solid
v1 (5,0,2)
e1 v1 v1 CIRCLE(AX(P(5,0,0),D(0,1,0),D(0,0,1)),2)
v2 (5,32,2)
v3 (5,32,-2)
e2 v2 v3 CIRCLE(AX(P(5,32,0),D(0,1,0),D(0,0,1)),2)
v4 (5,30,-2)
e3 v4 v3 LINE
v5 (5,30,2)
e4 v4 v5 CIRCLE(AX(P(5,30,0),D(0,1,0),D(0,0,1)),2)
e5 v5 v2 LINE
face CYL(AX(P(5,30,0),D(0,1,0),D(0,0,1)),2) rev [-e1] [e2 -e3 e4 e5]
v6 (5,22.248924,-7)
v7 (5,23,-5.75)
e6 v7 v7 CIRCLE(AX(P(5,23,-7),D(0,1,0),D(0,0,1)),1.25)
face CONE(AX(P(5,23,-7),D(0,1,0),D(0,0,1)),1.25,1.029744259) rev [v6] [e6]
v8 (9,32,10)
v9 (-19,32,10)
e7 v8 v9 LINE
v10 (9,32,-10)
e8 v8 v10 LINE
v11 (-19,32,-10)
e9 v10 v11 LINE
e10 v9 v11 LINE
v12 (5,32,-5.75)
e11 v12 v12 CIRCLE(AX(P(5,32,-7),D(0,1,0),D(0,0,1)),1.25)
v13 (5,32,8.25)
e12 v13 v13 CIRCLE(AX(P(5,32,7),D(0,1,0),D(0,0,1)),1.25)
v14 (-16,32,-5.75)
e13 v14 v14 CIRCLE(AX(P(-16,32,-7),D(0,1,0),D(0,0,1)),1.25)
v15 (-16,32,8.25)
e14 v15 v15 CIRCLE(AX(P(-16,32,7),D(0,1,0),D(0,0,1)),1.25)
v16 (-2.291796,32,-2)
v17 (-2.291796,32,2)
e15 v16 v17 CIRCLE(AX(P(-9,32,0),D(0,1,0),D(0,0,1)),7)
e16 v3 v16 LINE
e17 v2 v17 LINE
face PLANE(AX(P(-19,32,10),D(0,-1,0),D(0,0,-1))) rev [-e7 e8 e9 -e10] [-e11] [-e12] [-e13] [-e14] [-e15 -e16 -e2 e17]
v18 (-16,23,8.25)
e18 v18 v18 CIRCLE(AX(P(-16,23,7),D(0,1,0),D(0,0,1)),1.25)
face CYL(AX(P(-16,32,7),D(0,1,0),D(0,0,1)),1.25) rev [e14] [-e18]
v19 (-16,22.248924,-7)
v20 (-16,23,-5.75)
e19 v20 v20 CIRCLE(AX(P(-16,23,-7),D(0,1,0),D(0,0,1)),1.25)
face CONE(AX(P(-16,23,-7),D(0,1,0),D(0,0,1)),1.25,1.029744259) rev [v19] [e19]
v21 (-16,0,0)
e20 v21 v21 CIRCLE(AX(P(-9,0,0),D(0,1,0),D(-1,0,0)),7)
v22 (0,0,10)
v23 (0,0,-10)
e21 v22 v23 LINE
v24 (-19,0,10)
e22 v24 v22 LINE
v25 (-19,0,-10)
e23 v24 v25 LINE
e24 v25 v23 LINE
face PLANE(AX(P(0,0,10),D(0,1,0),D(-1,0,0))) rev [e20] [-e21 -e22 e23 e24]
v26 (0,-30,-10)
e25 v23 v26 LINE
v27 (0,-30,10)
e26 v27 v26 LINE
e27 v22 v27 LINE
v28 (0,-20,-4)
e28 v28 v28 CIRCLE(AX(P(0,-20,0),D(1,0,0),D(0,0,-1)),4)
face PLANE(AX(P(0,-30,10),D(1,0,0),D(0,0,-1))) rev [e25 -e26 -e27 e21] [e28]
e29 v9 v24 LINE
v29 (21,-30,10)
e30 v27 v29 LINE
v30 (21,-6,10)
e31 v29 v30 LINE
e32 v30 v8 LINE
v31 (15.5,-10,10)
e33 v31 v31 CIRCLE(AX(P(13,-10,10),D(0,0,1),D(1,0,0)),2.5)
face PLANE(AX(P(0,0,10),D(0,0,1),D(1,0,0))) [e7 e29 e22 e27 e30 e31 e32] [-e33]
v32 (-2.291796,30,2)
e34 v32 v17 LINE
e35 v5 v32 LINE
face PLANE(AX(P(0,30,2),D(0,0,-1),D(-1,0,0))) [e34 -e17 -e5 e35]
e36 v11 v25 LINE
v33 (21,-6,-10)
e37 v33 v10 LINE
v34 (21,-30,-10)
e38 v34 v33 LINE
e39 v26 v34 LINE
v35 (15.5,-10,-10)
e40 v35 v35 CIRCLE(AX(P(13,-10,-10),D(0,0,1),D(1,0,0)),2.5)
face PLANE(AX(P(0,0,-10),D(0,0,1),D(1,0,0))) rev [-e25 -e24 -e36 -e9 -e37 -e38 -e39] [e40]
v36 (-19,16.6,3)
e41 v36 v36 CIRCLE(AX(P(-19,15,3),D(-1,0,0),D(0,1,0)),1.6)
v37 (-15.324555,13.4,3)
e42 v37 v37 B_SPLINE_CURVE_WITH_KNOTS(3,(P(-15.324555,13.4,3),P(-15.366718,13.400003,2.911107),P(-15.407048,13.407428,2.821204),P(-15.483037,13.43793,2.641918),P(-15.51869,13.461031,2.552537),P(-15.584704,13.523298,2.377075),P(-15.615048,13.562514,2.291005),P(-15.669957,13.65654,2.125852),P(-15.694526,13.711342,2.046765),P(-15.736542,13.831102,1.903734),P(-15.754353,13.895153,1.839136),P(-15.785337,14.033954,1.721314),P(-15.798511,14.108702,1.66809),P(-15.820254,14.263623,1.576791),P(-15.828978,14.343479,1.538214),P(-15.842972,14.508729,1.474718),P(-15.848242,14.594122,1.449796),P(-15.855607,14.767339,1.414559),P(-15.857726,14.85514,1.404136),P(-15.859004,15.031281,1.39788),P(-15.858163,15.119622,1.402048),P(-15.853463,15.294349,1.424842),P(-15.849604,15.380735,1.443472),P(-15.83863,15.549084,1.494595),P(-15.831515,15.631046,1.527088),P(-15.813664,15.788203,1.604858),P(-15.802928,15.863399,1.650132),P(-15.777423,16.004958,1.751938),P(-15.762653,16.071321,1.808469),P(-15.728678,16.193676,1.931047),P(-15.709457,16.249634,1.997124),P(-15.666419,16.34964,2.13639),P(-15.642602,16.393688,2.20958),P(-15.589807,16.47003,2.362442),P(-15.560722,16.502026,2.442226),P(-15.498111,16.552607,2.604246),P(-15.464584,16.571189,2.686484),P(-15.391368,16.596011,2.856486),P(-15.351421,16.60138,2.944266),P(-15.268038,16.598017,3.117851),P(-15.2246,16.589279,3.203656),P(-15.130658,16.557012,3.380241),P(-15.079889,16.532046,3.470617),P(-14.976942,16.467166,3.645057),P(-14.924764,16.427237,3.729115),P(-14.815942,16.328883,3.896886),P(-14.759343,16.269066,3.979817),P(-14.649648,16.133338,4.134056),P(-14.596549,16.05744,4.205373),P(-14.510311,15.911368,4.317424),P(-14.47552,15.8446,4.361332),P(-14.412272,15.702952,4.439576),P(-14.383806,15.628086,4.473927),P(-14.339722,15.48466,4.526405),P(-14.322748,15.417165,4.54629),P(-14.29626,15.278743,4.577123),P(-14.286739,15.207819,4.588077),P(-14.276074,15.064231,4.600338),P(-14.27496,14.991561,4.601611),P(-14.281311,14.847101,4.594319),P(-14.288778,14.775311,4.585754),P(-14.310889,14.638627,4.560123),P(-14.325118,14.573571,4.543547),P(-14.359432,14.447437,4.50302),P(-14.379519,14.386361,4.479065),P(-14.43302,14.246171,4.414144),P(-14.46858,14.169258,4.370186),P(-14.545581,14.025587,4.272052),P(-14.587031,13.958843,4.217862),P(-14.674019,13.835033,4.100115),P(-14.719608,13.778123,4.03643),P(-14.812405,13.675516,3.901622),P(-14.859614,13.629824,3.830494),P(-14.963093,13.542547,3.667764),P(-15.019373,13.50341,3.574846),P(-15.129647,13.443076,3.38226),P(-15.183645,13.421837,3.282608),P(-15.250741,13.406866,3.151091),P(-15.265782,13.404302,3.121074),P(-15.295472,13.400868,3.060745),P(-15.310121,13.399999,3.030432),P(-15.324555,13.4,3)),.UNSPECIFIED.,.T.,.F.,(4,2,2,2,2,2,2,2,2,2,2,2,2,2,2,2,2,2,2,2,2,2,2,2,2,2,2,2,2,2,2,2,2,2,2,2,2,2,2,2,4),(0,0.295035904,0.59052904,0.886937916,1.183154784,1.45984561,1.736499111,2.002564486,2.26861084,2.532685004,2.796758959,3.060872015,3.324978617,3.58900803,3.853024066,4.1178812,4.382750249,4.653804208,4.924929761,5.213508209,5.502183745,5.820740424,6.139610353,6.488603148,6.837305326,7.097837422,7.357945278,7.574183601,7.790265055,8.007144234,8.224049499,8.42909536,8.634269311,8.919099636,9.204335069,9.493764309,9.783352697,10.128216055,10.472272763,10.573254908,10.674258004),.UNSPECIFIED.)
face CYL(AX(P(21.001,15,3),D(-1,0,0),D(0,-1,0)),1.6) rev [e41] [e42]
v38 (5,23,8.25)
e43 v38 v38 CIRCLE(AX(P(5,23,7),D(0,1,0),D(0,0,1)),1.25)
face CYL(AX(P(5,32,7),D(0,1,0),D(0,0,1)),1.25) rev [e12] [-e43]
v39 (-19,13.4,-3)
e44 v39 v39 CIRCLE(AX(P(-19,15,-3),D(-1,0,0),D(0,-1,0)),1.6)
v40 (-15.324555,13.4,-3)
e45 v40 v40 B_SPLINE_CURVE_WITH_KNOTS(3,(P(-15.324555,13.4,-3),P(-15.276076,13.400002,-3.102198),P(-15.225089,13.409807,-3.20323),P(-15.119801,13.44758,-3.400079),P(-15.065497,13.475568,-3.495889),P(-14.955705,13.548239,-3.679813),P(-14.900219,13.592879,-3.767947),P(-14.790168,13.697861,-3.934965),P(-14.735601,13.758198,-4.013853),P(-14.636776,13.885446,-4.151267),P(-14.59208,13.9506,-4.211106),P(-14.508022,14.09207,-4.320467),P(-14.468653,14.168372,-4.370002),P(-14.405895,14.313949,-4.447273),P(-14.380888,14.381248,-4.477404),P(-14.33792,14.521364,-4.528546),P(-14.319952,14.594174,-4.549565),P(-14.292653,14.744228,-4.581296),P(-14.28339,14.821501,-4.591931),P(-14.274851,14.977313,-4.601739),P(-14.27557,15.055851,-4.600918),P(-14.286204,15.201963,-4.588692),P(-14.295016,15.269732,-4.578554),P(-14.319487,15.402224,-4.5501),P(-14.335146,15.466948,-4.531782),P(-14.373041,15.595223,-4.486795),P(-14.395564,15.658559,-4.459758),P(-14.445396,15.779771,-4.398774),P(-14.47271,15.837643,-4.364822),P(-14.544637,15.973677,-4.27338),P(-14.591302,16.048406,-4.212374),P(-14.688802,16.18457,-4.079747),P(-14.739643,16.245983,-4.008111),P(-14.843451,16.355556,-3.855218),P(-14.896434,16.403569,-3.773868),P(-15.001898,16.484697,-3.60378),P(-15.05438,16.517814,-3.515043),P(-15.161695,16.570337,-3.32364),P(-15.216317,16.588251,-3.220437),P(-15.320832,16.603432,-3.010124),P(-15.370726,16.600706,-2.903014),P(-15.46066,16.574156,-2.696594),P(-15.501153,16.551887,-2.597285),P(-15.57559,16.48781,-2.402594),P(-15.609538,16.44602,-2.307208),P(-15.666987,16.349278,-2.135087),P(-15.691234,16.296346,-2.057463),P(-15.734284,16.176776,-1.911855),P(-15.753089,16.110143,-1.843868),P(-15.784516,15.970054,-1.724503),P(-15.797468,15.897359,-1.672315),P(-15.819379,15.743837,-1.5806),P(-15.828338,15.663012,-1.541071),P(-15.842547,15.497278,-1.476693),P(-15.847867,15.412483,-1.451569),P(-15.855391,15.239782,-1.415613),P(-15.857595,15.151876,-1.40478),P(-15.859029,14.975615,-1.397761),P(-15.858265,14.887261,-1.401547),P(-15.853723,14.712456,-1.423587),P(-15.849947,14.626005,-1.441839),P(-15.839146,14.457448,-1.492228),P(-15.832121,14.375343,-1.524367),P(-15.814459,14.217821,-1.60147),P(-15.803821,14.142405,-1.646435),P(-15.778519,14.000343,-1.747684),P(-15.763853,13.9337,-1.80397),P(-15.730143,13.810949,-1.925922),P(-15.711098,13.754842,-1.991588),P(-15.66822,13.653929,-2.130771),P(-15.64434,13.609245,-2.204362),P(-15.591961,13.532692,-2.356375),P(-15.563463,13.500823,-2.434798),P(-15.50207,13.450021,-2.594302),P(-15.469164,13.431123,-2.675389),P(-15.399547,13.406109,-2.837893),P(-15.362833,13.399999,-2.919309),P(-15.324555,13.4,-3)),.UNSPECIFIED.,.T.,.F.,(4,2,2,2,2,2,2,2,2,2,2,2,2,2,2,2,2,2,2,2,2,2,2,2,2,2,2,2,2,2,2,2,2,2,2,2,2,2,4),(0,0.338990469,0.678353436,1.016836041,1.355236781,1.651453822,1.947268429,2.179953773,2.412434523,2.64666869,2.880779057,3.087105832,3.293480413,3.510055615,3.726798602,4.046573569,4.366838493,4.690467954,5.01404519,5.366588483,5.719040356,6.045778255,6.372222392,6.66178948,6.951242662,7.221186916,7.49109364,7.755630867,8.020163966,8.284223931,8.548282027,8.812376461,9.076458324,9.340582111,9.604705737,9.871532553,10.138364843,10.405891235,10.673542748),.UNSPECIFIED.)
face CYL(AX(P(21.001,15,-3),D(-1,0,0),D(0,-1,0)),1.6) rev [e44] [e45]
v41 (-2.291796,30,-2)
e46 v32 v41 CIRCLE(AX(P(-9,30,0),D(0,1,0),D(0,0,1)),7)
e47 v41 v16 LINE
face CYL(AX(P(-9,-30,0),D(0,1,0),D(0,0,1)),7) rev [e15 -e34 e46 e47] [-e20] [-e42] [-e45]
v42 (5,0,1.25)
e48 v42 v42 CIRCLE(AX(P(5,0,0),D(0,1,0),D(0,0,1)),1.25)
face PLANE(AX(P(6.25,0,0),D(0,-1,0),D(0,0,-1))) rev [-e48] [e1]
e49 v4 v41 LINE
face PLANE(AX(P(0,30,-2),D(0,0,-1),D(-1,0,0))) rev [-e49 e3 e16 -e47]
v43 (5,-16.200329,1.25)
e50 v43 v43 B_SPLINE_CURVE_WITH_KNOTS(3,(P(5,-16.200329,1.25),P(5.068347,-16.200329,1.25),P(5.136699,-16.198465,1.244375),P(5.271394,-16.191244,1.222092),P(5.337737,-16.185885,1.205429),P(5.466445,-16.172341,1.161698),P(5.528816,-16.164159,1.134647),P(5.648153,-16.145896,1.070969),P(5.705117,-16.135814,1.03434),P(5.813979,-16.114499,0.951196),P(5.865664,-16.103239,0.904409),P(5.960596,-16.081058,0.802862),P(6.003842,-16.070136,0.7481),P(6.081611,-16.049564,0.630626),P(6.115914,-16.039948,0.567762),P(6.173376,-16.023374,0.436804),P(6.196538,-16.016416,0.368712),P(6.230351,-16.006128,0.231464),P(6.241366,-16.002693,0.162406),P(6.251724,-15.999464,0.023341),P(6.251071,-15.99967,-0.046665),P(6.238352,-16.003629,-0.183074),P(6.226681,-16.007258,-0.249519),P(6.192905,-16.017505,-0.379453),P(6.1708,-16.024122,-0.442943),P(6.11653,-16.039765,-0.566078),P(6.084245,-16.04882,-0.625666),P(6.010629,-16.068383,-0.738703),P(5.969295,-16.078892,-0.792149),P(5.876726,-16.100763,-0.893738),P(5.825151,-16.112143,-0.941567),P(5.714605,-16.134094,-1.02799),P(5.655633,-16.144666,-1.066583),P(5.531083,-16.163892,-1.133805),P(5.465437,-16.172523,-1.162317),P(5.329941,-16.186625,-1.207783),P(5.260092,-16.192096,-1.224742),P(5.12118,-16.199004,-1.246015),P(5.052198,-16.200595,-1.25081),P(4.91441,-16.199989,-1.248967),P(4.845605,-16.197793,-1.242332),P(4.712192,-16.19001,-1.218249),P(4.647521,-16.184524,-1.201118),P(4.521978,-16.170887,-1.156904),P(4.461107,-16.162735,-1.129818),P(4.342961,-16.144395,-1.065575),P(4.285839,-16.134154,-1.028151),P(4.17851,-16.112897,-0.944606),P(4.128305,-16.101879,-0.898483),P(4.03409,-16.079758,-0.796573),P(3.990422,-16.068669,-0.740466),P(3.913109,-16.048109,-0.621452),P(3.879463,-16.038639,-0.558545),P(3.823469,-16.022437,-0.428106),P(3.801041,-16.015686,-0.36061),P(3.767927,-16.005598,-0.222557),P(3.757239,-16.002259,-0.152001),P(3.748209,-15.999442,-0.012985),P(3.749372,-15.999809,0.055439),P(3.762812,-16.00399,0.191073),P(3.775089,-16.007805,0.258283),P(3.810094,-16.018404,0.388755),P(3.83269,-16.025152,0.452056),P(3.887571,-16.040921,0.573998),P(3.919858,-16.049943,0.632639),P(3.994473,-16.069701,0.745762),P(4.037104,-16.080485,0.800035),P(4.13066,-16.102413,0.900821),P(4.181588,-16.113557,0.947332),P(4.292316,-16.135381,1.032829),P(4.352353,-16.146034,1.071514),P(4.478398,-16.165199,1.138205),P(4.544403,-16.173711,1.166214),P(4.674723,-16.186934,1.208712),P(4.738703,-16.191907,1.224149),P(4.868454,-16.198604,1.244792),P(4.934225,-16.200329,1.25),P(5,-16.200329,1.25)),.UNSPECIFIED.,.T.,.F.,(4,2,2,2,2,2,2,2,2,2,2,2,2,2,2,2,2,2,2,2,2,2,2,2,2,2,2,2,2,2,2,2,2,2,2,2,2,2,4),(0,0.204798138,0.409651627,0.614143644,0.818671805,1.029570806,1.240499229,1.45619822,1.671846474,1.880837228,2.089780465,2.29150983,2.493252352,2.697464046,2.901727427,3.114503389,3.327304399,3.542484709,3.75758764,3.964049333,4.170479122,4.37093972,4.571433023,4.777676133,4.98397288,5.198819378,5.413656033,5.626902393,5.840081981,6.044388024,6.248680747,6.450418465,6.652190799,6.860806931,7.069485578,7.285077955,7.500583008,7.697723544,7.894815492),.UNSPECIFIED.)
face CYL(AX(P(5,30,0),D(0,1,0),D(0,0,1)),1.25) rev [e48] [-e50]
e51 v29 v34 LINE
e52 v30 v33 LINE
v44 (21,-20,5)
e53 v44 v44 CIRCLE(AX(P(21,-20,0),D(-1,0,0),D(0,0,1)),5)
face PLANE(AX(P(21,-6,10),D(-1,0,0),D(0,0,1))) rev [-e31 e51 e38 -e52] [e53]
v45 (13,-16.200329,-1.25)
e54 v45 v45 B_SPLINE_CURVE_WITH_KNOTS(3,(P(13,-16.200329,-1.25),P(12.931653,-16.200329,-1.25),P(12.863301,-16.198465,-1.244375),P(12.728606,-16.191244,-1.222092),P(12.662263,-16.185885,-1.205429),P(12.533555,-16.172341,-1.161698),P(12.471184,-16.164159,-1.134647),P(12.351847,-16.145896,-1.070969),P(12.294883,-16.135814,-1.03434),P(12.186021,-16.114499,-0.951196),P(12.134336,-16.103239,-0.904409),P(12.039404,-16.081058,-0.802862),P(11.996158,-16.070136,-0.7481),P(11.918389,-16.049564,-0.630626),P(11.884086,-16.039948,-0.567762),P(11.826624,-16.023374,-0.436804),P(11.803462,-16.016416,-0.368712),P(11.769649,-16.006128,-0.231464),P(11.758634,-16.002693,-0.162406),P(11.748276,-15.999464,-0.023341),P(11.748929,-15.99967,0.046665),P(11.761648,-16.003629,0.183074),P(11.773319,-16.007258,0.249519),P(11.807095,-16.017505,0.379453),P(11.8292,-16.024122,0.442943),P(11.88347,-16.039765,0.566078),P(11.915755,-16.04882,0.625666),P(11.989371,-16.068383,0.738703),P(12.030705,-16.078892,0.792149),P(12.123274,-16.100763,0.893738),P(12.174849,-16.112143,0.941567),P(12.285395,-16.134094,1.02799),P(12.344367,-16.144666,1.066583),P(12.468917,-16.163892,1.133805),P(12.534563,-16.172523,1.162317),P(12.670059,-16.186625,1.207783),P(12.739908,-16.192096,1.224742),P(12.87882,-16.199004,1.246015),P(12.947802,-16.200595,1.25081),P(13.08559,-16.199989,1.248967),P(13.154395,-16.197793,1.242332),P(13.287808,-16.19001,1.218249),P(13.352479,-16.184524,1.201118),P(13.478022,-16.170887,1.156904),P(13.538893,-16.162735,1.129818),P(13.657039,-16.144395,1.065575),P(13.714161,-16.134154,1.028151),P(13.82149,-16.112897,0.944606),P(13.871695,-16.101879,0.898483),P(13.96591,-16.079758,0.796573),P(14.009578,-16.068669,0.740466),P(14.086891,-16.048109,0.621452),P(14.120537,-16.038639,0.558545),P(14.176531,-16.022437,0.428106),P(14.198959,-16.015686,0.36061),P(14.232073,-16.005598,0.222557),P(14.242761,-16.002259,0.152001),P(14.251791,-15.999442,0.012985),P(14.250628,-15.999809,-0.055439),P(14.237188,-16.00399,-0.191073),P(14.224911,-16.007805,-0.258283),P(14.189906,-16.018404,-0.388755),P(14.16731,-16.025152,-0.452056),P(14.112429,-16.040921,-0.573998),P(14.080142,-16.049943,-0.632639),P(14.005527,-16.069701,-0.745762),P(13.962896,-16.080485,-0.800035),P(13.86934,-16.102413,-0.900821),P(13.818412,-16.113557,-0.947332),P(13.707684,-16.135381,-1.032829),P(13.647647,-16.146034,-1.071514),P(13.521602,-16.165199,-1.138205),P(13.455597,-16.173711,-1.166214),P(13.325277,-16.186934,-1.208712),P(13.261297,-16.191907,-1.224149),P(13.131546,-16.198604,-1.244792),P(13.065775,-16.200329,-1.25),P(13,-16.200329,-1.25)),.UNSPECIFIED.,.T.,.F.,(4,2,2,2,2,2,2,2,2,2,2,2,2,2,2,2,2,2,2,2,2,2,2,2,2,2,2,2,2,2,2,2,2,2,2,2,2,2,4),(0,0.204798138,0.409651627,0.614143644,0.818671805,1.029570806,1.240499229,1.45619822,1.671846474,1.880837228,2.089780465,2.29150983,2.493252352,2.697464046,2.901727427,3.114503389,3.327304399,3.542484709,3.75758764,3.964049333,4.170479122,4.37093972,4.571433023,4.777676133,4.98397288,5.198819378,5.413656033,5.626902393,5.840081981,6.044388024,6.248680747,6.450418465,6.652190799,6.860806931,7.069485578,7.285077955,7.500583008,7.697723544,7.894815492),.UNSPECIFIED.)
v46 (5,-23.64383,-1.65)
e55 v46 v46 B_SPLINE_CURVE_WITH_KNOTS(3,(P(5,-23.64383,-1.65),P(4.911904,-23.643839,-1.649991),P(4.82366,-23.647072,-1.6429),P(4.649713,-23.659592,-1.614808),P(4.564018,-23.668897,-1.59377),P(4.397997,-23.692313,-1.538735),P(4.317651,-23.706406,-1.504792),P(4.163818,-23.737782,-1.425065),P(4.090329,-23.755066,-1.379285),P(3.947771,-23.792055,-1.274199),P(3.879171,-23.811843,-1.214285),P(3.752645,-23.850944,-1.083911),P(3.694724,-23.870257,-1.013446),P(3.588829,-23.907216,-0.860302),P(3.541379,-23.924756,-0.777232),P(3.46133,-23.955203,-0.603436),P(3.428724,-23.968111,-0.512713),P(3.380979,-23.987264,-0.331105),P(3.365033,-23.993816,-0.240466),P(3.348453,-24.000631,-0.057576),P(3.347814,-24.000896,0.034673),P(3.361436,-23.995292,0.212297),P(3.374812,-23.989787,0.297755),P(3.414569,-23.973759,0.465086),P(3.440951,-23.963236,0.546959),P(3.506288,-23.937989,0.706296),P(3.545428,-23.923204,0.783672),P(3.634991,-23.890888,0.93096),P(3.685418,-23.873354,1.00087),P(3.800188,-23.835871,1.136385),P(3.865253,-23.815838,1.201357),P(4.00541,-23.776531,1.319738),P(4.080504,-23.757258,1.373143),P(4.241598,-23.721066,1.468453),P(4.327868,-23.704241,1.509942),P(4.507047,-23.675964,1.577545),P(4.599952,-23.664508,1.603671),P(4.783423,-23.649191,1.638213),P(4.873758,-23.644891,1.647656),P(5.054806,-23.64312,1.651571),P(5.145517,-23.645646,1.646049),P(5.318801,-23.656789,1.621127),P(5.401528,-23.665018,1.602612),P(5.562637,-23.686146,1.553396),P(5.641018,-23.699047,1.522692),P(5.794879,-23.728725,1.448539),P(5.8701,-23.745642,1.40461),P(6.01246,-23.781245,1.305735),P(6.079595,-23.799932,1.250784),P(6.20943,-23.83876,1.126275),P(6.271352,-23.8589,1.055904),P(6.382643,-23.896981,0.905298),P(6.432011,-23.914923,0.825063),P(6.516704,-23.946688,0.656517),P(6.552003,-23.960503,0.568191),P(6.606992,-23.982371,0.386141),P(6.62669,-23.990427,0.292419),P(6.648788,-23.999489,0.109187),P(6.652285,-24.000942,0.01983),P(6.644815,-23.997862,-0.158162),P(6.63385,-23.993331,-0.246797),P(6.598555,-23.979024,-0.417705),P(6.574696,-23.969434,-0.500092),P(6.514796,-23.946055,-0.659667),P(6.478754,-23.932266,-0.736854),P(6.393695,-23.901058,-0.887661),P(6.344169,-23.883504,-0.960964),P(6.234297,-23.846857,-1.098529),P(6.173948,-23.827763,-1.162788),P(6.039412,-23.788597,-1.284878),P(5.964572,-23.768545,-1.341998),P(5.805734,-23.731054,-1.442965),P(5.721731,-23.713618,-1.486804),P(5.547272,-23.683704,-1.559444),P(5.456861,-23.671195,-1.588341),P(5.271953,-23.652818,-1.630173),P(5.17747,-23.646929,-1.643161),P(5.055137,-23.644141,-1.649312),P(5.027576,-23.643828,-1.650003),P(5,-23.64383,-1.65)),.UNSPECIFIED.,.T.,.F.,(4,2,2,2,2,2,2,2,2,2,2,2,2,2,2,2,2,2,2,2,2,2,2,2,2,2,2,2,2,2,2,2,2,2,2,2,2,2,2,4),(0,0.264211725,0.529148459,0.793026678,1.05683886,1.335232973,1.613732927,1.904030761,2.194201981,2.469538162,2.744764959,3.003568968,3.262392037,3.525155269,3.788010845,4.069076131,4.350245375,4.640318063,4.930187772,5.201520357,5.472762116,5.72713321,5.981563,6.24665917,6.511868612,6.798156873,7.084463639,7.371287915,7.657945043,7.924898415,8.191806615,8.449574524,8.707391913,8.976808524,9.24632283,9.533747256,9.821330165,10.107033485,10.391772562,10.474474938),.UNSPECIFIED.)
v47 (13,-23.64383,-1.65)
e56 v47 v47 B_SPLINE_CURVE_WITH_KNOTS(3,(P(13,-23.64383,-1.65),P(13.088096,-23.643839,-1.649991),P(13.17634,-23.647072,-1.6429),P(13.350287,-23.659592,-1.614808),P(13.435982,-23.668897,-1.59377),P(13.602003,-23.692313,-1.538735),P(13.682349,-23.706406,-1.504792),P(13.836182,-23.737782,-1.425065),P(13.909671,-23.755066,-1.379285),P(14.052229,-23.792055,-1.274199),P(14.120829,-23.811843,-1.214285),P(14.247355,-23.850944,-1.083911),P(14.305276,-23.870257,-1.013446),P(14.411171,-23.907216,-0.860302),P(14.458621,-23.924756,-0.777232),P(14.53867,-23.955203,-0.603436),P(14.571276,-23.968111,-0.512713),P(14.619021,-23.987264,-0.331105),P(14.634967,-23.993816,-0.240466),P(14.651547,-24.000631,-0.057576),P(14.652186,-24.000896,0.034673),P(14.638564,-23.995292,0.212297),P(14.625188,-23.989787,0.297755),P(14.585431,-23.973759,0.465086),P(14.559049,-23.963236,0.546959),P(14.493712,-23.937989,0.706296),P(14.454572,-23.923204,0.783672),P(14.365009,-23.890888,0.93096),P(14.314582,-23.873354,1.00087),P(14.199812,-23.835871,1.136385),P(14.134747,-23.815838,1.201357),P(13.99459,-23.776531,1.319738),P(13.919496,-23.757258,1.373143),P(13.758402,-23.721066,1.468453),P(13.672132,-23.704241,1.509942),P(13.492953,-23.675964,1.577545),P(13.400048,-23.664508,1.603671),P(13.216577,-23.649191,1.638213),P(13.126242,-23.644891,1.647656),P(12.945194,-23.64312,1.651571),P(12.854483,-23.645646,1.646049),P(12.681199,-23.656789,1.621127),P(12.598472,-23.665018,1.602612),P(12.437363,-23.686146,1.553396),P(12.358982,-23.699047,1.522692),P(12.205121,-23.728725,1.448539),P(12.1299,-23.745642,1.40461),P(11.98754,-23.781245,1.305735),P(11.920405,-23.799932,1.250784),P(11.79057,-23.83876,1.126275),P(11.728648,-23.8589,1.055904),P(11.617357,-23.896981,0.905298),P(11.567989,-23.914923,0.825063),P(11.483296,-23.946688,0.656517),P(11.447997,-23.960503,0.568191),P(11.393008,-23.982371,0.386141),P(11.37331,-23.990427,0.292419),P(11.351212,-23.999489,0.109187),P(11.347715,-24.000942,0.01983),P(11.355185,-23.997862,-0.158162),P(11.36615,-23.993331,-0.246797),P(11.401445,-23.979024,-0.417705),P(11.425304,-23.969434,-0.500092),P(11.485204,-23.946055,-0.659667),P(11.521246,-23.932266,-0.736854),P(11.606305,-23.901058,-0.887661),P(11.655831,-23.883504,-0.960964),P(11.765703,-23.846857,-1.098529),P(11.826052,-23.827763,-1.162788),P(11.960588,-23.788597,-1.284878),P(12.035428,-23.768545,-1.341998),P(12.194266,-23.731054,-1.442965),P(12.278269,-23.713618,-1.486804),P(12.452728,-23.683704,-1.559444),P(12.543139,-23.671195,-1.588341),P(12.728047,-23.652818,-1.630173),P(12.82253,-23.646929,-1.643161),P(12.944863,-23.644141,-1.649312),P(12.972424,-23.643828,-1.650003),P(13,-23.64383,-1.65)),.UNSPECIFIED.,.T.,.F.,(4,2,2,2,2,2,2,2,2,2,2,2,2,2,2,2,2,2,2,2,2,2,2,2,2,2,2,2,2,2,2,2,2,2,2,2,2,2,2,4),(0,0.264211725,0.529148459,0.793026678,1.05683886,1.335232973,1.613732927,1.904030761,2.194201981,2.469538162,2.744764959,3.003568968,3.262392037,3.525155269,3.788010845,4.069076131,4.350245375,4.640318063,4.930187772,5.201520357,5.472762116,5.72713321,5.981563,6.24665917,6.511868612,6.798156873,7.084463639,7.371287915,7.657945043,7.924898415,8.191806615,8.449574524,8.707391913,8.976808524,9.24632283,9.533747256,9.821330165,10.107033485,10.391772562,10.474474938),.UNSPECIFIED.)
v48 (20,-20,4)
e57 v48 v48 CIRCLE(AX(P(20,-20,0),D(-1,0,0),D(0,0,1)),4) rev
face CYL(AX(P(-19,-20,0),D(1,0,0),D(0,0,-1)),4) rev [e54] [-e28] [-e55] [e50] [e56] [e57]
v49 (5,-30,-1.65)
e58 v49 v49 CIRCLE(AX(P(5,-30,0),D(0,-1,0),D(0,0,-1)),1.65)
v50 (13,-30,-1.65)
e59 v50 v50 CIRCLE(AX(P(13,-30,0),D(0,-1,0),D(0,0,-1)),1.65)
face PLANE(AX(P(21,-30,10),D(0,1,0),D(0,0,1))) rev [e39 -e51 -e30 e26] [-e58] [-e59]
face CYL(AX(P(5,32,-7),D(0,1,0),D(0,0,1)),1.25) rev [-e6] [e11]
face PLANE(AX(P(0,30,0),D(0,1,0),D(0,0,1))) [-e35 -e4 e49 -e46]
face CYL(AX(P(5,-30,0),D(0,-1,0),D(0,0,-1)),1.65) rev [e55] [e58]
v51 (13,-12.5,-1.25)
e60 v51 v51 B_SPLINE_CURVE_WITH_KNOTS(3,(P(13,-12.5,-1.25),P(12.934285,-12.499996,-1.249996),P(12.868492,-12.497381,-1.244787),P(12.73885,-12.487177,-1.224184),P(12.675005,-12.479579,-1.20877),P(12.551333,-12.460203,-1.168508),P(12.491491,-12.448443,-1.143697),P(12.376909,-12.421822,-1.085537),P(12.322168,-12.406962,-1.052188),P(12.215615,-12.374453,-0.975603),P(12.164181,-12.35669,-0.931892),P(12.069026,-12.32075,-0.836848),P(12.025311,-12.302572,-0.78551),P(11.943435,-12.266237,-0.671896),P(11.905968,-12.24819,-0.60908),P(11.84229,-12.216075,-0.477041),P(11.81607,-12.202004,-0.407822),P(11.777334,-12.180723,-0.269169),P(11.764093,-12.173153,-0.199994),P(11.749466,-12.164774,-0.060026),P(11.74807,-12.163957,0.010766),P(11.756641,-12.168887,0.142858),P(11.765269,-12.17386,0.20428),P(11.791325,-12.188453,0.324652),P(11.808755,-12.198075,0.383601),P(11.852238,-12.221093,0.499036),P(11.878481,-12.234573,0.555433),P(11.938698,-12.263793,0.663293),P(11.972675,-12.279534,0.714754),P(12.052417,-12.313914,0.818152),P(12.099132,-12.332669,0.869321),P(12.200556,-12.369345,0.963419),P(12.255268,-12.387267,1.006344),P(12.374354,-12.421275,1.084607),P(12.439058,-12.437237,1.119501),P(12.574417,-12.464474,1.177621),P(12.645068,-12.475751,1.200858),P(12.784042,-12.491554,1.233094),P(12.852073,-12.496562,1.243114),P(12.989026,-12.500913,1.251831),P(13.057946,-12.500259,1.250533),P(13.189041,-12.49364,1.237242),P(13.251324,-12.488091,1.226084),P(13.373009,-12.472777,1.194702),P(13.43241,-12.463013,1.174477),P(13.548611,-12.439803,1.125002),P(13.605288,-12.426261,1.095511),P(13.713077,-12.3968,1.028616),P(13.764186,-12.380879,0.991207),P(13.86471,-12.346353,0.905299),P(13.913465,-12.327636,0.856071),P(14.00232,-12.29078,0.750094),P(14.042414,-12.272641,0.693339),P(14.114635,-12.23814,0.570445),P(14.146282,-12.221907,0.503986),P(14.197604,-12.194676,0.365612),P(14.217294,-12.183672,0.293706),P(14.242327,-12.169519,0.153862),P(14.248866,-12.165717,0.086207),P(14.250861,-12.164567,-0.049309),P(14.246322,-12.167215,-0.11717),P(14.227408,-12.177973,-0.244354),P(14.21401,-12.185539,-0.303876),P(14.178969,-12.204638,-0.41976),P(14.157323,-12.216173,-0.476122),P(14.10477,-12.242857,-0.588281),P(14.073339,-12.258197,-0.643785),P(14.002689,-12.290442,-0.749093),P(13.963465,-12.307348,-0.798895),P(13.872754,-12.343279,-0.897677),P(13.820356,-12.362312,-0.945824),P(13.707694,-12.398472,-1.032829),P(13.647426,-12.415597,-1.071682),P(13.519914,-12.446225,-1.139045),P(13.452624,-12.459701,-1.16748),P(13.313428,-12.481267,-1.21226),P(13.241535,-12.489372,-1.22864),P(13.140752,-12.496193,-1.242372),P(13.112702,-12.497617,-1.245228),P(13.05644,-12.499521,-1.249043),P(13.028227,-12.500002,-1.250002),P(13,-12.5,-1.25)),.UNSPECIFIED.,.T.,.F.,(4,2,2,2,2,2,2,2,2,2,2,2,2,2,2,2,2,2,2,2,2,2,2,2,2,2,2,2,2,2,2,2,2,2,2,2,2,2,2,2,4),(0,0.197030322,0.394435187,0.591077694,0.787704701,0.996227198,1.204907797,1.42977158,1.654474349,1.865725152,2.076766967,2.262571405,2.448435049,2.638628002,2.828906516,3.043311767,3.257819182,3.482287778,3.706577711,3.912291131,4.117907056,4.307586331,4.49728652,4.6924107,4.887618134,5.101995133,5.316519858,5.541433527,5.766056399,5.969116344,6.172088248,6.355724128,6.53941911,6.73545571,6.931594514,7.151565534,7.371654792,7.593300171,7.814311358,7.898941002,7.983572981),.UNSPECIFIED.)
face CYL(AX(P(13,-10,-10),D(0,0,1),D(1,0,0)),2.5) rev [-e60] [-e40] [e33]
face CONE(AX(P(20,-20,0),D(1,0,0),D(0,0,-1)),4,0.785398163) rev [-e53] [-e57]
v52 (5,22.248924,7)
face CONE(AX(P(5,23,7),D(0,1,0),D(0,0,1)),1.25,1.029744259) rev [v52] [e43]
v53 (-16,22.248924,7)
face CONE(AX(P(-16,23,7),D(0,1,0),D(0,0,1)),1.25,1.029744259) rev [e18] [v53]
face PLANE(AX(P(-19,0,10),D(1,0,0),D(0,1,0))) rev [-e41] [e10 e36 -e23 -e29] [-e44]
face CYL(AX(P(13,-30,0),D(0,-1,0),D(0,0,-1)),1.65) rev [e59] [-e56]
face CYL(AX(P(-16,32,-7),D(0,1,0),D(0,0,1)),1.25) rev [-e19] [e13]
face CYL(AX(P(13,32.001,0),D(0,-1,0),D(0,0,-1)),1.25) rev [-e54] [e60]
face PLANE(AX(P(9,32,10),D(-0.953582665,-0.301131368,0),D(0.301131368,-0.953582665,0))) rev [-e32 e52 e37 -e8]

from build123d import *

# Parameters (mm, degrees)
BOSS_EXTRUDE1_DEPTH     = 10
CUT_EXTRUDE1_DEPTH      = 67.219333
CUT_EXTRUDE2_DEPTH      = 2
M3_TAPPED_HOLE1_D       = 2.5
M3_TAPPED_HOLE1_DEPTH   = 9
M3_TAPPED_HOLE1_TIP     = 0.751076
SKETCH5_R               = 2.5
CUT_EXTRUDE3_DEPTH      = 44.185646
SKETCH6_R               = 4
CUT_EXTRUDE4_DEPTH      = 53.191953
CHAMFER1_SIZE           = 1
HOLE1_OUTLINE_R         = 2
HOLE1_DEPTH             = 30
HOLE1_START             = -16.200329
HOLE1_2_OUTLINE_R       = 1.25
HOLE1_2_DEPTH           = 16.200329
CUT_EXTRUDE5_REACH      = 54.192
CUT_EXTRUDE5_END_RADIUS = 7
SKETCH9_R               = 1.6
M4_TAPPED_HOLE1_REACH   = 68.219
M4_TAPPED_HOLE1_BORE_R  = 1.65
CUT_EXTRUDE6_REACH      = 68.219
CUT_EXTRUDE6_END_RADIUS = 2.5
SKETCH13_R              = 1.25


# Read off the part's stored shape, not the designer's step: Hole1
with BuildPart() as part:
    # Sketch1 → Boss-Extrude1 (new, symmetric)
    with BuildSketch(Plane.XY):
        Polygon((0, 0), (-19, 0), (-19, 32), (9, 32), (21, -6), (21, -30), (0, -30), align=None)
    extrude(amount=BOSS_EXTRUDE1_DEPTH, both=True)

    # Sketch2 → Cut-Extrude1 (cut, through all)
    with BuildSketch(Plane(origin=(0, 32, 0), x_dir=(1, 0, 0), z_dir=(0, 1, 0))):
        with BuildLine():
            ThreePointArc((-2.291796, 2), (-10.010587, 6.926667), (-16, 0))
            Line((-16, 0), (-2, 0))
            ThreePointArc((-2, 0), (-2.073333, 1.010587), (-2.291796, 2))
        make_face()
        with BuildLine():
            Line((-2, 0), (-16, 0))
            ThreePointArc((-16, 0), (-10.010587, -6.926667), (-2.291796, -2))
            ThreePointArc((-2.291796, -2), (-2.073333, -1.010587), (-2, 0))
        make_face()
    extrude(amount=-CUT_EXTRUDE1_DEPTH, mode=Mode.SUBTRACT)

    # Sketch2<3> → Cut-Extrude2 (cut)
    with BuildSketch(Plane(origin=(0, 32, 0), x_dir=(1, 0, 0), z_dir=(0, 1, 0))):
        with BuildLine():
            ThreePointArc((-2.291796, 2), (-2.073333, 1.010587), (-2, 0))
            Line((-2, 0), (3, 0))
            ThreePointArc((3, 0), (3.585786, 1.414214), (5, 2))
            Line((5, 2), (-2.291796, 2))
        make_face()
        with BuildLine():
            Line((3, 0), (-2, 0))
            ThreePointArc((-2, 0), (-2.073333, -1.010587), (-2.291796, -2))
            Line((-2.291796, -2), (5, -2))
            ThreePointArc((5, -2), (3.585786, -1.414214), (3, 0))
        make_face()
        with BuildLine():
            ThreePointArc((5, 2), (3.585786, 1.414214), (3, 0))
            Line((3, 0), (7, 0))
            ThreePointArc((7, 0), (6.414214, 1.414214), (5, 2))
        make_face()
        with BuildLine():
            Line((7, 0), (3, 0))
            ThreePointArc((3, 0), (3.585786, -1.414214), (5, -2))
            ThreePointArc((5, -2), (6.414214, -1.414214), (7, 0))
        make_face()
    extrude(amount=-CUT_EXTRUDE2_DEPTH, mode=Mode.SUBTRACT)

    # M3 Tapped Hole1
    with Locations(Plane(origin=(0, 32, 0), x_dir=(1, 0, 0), z_dir=(0, 1, 0))):
        with Locations((-16, 7), (-16, -7), (5, -7), (5, 7)):
            Hole(M3_TAPPED_HOLE1_D / 2, depth=M3_TAPPED_HOLE1_DEPTH)
            with Locations((0, 0, -(M3_TAPPED_HOLE1_DEPTH + M3_TAPPED_HOLE1_TIP / 2))):  # 118° drill point
                Cone(0, M3_TAPPED_HOLE1_D / 2, M3_TAPPED_HOLE1_TIP, mode=Mode.SUBTRACT)

    # Sketch5 → Cut-Extrude3 (cut, through all)
    with BuildSketch(Plane.XY.offset(10)):
        with Locations((13, -10)):
            Circle(SKETCH5_R)
    extrude(amount=-CUT_EXTRUDE3_DEPTH, mode=Mode.SUBTRACT)

    # Sketch6 → Cut-Extrude4 (cut, through all)
    with BuildSketch(Plane(origin=(21, 0, 0), x_dir=(0, 0, -1), z_dir=(1, 0, 0))):
        with Locations((0, -20)):
            Circle(SKETCH6_R)
    extrude(amount=-CUT_EXTRUDE4_DEPTH, mode=Mode.SUBTRACT)

    # Chamfer1
    chamfer1_edges = [part.edges().sort_by_distance(p)[0] for p in [
        (21, -20, 4),
    ]]
    chamfer(chamfer1_edges, length=CHAMFER1_SIZE)

    # Hole1 outline → Hole1 (cut)
    with BuildSketch(Plane(origin=(0, 0, 0), x_dir=(1, 0, 0), z_dir=(0, 1, 0))):
        with Locations((5, 0)):
            Circle(HOLE1_OUTLINE_R)
    extrude(amount=HOLE1_DEPTH, mode=Mode.SUBTRACT)

    # Hole1 2 outline → Hole1 2 (cut)
    with BuildSketch(Plane(origin=(0, 0, 0), x_dir=(1, 0, 0), z_dir=(0, 1, 0)).offset(HOLE1_START)):
        with Locations((5, 0)):
            Circle(HOLE1_2_OUTLINE_R)
    extrude(amount=HOLE1_2_DEPTH, mode=Mode.SUBTRACT)

    # Cut-Extrude5: up to this cylinder (the profile starts outside it)
    cut_extrude5_end = Plane(origin=(-9, 15, 0), z_dir=(0, 1, 0)) * Cylinder(CUT_EXTRUDE5_END_RADIUS, 123.384, mode=Mode.PRIVATE)
    # Sketch9 → Cut-Extrude5 (cut, up to the surface)
    with BuildSketch(Plane.ZY.offset(19), mode=Mode.PRIVATE) as cut_extrude5_sk1:
        with Locations(Location((-3, 15, 0), (0, 0, 270))):
            Circle(SKETCH9_R)
    cut_extrude5_tool1 = extrude(cut_extrude5_sk1.sketch, amount=-CUT_EXTRUDE5_REACH, mode=Mode.PRIVATE) - cut_extrude5_end
    add(cut_extrude5_tool1.solids().sort_by_distance((-19, 15, -3))[0], mode=Mode.SUBTRACT)
    # Sketch9 → Cut-Extrude5 (cut, up to the surface)
    with BuildSketch(Plane.ZY.offset(19), mode=Mode.PRIVATE) as cut_extrude5_sk2:
        with Locations(Location((3, 15, 0), (0, 0, 270))):
            Circle(SKETCH9_R)
    cut_extrude5_tool2 = extrude(cut_extrude5_sk2.sketch, amount=-CUT_EXTRUDE5_REACH, mode=Mode.PRIVATE) - cut_extrude5_end
    add(cut_extrude5_tool2.solids().sort_by_distance((-19, 15, 3))[0], mode=Mode.SUBTRACT)

    # M4 Tapped Hole1 bore → M4 Tapped Hole1 (cut, up to next)
    with BuildSketch(Plane(origin=(0, -30, 0), x_dir=(-1, 0, 0), z_dir=(0, -1, 0)), mode=Mode.PRIVATE) as m4_tapped_hole1_sk1:
        with Locations((-5, 0)):
            Circle(M4_TAPPED_HOLE1_BORE_R)
    m4_tapped_hole1_tool1 = extrude(m4_tapped_hole1_sk1.sketch, amount=-M4_TAPPED_HOLE1_REACH, mode=Mode.PRIVATE) & part.part
    # M4 Tapped Hole1 bore → M4 Tapped Hole1 (cut, up to next)
    with BuildSketch(Plane(origin=(0, -30, 0), x_dir=(-1, 0, 0), z_dir=(0, -1, 0)), mode=Mode.PRIVATE) as m4_tapped_hole1_sk2:
        with Locations((-13, 0)):
            Circle(M4_TAPPED_HOLE1_BORE_R)
    m4_tapped_hole1_tool2 = extrude(m4_tapped_hole1_sk2.sketch, amount=-M4_TAPPED_HOLE1_REACH, mode=Mode.PRIVATE) & part.part
    add(m4_tapped_hole1_tool1.solids().sort_by_distance((5, -30, 0))[0], mode=Mode.SUBTRACT)
    add(m4_tapped_hole1_tool2.solids().sort_by_distance((13, -30, 0))[0], mode=Mode.SUBTRACT)

    # Cut-Extrude6: up to this cylinder (the profile starts outside it)
    cut_extrude6_end = Plane(origin=(13, -10, 0), z_dir=(0, 0, 1)) * Cylinder(CUT_EXTRUDE6_END_RADIUS, 142.438, mode=Mode.PRIVATE)
    # Sketch13 → Cut-Extrude6 (cut, up to the surface)
    with BuildSketch(Plane.XZ.offset(30), mode=Mode.PRIVATE) as cut_extrude6_sk1:
        with Locations(Location((13, 0, 0), (0, 0, 270))):
            Circle(SKETCH13_R)
    cut_extrude6_tool1 = extrude(cut_extrude6_sk1.sketch, amount=-CUT_EXTRUDE6_REACH, mode=Mode.PRIVATE) - cut_extrude6_end
    add(cut_extrude6_tool1.solids().sort_by_distance((13, -30, 0))[0], mode=Mode.SUBTRACT)


solid = part.part
